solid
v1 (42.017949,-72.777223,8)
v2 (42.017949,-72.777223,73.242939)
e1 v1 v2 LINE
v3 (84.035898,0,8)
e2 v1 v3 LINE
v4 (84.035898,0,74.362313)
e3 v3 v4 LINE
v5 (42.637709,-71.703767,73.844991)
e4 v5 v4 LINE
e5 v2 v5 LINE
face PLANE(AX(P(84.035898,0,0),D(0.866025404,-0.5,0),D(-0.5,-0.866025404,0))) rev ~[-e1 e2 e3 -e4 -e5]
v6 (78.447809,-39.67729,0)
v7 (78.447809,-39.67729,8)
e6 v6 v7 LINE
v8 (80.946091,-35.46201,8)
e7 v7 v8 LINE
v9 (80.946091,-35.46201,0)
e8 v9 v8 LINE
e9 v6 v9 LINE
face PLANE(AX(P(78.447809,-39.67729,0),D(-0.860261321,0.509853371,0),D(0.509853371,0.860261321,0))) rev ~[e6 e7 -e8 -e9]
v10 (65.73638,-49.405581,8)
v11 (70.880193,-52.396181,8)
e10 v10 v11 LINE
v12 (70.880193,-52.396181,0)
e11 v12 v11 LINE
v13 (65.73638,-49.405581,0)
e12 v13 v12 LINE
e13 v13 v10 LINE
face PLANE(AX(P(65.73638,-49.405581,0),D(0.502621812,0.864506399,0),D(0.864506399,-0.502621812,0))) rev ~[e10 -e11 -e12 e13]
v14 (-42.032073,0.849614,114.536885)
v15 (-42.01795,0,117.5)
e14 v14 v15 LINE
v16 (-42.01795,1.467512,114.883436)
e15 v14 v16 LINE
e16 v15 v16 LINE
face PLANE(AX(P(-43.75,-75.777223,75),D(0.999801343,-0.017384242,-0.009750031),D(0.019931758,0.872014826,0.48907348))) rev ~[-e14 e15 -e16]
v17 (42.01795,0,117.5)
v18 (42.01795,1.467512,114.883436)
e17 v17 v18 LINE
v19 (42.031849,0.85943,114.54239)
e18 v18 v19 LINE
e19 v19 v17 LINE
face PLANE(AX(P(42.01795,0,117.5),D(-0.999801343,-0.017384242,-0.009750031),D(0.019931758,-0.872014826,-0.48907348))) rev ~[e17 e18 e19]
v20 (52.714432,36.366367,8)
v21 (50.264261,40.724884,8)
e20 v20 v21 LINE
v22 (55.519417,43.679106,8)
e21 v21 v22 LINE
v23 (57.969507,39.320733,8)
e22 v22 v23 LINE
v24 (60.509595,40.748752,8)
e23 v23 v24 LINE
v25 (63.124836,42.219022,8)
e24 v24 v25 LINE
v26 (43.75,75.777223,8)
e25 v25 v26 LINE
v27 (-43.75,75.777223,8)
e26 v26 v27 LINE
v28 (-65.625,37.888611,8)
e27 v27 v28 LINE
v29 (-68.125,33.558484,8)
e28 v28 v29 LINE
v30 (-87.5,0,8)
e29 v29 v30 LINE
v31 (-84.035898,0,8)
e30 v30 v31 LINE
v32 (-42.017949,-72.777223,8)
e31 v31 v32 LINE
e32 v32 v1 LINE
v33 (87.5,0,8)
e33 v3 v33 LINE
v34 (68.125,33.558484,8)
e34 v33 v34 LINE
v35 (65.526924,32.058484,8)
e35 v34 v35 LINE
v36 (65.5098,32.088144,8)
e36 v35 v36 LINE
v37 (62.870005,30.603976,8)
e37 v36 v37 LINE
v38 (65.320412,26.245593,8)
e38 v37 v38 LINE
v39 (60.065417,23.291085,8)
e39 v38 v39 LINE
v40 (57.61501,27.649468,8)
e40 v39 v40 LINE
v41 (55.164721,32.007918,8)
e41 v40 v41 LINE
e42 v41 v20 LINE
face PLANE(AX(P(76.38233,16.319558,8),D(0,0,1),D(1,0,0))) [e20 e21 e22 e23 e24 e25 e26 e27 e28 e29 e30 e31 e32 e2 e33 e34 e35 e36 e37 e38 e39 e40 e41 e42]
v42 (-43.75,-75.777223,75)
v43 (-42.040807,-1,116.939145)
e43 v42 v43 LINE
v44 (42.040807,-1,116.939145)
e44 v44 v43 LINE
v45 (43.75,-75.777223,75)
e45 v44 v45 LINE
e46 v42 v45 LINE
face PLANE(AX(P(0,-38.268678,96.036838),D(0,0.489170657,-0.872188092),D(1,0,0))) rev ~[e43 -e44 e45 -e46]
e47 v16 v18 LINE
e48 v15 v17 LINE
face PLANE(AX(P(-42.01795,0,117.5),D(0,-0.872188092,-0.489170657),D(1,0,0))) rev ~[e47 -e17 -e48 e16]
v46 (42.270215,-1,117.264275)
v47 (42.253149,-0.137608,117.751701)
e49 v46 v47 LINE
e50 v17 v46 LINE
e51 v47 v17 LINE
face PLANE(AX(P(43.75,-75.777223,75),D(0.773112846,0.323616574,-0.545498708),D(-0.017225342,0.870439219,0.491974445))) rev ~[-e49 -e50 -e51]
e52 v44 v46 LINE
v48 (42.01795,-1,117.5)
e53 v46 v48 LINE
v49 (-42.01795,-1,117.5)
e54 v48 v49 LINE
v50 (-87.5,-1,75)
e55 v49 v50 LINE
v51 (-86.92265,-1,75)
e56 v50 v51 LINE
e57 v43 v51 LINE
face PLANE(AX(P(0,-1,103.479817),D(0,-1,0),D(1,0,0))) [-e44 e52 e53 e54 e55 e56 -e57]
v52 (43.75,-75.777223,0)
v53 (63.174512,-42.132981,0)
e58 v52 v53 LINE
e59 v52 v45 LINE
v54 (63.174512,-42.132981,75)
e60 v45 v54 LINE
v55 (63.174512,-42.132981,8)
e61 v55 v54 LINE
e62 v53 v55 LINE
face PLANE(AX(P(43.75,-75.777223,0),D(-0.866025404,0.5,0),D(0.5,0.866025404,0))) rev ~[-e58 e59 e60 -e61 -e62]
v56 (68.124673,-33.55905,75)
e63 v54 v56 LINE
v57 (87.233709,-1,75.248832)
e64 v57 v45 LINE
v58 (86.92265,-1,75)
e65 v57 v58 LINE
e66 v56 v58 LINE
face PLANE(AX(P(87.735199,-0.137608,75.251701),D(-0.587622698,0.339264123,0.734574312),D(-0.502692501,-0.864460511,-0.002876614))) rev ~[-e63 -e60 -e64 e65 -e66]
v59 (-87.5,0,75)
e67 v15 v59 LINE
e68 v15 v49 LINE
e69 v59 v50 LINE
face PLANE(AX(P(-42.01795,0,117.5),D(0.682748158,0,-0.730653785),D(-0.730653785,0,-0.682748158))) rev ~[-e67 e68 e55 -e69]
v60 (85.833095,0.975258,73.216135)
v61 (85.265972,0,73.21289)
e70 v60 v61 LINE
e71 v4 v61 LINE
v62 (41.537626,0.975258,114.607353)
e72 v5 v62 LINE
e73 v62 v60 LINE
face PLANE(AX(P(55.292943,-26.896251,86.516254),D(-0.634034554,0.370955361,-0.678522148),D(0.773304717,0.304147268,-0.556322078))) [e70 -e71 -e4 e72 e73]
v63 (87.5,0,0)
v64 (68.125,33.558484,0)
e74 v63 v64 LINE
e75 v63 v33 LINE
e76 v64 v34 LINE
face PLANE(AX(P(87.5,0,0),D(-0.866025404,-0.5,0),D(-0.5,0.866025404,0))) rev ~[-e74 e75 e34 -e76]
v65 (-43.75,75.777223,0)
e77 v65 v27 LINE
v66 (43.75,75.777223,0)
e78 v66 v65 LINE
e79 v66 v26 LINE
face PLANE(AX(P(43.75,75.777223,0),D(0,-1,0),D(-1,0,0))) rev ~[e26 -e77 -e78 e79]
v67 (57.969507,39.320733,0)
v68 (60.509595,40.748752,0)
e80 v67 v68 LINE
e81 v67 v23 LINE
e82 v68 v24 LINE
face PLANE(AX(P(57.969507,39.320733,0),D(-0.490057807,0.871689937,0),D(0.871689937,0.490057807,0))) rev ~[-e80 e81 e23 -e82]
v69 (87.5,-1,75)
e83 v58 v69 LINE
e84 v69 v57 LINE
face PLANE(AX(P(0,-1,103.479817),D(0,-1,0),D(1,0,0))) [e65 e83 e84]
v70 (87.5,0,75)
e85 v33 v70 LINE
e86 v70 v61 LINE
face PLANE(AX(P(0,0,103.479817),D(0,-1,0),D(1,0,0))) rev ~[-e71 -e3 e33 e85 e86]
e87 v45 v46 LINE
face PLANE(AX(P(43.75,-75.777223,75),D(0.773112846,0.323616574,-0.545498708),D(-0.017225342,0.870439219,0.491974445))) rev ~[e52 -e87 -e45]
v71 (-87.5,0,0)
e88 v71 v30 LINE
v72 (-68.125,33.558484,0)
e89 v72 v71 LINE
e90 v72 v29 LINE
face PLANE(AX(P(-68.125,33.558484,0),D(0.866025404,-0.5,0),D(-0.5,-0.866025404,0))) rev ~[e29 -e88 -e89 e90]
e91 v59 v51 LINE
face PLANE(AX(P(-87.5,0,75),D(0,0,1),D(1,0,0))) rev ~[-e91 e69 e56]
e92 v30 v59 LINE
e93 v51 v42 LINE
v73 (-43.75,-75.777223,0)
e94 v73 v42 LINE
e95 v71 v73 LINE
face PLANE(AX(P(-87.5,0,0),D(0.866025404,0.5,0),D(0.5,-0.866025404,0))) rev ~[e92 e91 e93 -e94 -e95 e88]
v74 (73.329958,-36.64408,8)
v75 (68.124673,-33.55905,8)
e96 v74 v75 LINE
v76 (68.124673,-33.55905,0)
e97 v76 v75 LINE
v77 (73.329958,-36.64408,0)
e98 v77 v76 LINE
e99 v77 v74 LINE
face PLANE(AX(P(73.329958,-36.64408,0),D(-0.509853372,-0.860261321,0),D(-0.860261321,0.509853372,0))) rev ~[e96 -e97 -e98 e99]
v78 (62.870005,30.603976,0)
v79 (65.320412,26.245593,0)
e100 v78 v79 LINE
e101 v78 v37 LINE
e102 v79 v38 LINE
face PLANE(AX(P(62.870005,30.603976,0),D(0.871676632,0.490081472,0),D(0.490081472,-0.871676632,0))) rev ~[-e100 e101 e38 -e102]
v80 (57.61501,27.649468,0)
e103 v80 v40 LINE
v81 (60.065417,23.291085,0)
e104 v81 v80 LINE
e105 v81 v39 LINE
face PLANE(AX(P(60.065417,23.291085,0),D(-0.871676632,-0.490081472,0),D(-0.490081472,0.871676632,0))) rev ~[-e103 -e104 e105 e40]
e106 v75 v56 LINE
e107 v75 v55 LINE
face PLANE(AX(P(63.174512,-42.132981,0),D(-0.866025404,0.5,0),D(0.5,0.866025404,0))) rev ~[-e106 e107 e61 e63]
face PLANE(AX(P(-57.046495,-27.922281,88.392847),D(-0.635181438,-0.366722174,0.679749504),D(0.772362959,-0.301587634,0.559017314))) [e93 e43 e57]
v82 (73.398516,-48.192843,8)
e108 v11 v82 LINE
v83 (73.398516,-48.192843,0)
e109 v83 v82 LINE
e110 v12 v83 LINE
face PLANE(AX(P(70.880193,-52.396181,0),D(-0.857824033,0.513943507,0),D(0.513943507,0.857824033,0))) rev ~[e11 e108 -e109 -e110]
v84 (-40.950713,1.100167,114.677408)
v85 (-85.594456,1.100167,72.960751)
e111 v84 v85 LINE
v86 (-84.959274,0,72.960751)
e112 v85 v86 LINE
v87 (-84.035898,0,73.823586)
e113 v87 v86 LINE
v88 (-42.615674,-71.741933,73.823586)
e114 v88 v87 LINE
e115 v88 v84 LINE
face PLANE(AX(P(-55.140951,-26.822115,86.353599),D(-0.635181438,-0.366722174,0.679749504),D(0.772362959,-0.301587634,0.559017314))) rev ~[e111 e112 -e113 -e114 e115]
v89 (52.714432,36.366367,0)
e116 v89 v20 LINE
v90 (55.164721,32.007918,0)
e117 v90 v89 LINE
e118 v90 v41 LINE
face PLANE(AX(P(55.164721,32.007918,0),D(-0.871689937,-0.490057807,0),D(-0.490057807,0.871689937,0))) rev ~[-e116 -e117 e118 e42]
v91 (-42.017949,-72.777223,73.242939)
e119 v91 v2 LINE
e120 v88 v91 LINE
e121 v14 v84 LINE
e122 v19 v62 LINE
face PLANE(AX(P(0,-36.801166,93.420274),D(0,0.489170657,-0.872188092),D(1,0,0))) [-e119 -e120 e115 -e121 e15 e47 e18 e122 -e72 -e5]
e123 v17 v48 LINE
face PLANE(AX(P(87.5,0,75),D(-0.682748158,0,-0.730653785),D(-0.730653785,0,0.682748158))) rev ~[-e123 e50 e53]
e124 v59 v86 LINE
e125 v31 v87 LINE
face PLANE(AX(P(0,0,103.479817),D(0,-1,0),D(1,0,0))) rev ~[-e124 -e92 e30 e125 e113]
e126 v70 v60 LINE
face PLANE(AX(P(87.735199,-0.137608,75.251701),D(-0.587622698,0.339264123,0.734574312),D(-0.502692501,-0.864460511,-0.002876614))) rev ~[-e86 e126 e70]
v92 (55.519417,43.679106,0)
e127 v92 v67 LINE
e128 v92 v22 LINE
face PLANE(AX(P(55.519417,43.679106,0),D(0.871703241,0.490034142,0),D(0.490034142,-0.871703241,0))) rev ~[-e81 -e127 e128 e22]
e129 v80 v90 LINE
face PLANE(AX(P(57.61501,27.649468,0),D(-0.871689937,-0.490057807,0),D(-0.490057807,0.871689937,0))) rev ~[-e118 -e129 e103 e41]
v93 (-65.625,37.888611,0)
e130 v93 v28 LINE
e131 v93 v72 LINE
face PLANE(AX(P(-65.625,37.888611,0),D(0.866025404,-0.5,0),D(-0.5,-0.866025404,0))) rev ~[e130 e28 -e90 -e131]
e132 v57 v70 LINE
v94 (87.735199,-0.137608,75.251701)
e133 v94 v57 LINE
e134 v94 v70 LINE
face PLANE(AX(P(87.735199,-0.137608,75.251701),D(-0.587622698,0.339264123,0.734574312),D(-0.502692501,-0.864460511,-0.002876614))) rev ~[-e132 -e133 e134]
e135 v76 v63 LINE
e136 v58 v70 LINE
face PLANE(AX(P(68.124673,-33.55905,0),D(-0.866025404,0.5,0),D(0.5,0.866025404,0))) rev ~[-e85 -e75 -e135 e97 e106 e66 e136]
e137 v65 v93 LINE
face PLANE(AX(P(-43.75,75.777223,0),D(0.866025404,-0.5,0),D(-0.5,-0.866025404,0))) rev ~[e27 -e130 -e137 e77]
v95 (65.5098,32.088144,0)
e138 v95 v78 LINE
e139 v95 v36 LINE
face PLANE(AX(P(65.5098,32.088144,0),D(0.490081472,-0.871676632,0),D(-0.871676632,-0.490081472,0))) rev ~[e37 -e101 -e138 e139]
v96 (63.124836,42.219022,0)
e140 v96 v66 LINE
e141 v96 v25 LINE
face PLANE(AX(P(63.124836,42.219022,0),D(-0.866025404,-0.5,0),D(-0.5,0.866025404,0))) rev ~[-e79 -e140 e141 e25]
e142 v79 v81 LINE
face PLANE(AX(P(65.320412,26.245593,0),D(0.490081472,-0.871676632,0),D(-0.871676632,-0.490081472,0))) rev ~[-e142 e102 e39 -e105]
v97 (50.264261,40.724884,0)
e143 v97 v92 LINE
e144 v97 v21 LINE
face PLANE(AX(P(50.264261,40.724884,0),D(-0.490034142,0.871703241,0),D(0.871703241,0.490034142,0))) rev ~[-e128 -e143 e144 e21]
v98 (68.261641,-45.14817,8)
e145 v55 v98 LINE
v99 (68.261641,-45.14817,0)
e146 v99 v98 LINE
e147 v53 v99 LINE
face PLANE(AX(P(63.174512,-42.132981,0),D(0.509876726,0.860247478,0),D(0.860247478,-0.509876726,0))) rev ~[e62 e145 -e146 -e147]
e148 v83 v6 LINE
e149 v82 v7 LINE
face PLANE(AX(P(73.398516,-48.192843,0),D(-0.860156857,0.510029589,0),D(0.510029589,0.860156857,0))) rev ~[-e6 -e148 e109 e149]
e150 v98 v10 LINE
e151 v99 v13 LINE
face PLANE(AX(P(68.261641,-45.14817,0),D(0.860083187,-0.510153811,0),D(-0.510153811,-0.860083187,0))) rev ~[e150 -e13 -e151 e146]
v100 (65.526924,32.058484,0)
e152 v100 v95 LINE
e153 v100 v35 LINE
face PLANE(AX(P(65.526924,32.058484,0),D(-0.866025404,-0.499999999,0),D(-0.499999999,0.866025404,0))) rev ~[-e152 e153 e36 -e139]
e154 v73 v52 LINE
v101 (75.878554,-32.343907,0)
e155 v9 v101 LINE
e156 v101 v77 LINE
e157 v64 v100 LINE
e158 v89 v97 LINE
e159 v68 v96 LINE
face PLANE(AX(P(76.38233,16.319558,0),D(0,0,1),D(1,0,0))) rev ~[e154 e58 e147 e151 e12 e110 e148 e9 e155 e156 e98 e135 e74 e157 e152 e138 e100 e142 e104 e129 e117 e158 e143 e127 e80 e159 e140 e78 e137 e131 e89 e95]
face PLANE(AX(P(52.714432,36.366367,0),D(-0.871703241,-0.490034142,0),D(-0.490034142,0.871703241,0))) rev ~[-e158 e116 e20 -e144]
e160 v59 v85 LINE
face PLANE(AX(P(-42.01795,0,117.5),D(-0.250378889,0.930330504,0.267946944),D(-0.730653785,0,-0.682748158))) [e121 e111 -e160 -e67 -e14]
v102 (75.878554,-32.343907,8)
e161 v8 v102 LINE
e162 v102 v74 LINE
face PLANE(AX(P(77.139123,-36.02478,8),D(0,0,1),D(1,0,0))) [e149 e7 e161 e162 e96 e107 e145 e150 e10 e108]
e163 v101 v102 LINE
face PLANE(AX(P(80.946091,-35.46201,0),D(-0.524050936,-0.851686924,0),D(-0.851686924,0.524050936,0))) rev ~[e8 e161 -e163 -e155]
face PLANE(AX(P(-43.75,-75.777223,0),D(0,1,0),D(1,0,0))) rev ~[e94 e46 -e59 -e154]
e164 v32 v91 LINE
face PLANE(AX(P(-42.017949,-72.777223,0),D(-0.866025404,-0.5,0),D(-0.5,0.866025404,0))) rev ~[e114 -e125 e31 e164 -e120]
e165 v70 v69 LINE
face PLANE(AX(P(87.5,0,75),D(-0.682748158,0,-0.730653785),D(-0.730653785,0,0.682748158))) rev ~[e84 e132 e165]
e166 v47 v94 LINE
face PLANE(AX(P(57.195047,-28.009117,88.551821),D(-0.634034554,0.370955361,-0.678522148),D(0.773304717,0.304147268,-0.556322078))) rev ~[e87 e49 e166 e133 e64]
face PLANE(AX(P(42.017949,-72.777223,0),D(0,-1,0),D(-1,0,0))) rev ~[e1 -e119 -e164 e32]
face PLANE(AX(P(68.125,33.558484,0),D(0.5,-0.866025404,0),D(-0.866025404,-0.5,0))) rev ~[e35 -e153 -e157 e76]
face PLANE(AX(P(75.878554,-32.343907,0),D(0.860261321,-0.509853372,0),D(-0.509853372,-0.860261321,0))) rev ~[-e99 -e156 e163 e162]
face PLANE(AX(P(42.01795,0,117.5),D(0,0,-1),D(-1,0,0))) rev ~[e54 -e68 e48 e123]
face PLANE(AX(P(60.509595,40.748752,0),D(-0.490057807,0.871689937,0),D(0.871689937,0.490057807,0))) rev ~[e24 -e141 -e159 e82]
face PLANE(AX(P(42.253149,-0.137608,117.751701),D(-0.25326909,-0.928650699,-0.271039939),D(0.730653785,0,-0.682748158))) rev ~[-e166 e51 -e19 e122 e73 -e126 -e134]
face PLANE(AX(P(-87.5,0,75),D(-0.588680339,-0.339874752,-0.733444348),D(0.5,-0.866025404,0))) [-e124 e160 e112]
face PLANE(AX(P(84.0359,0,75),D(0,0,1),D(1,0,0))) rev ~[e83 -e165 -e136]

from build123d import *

# Parameters (mm, degrees)
F0_W      = 50
F0_H      = 12.5
F1_DEPTH  = 8
F2_DEPTH  = 75
F4_DEPTH  = 8
F7_DEPTH  = 3
F8_DEPTH  = 1
F11_DEPTH = 3
F14_DEPTH = 3
F15_DEPTH = 8
F16_DEPTH = 8
F17_DEPTH = 8


# Not quite as in the source:
# - a feature names something its author has since deleted; it is built from what else it names


with BuildPart() as f1:
    # F0 (on Top) → F1 (new body)
    with BuildSketch(Plane.XY):
        Polygon((57.9695070384, 39.3207329262), (60.5095952989, 40.7487522591), (42.0179491924, 72.7772228311), (-42.0179491924, 72.7772228311), (-84.0358983849, 0), (-42.0179491924, -72.7772228311), (42.0179491924, -72.7772228311), (84.0358983849, 0), (65.5269237886, 32.0584843966), (65.5097997054, 32.0881441788), (62.870004896, 30.6039762231), (65.3204122546, 26.2455930623), (60.0654171506, 23.2910848888), (57.615009792, 27.6494680496), (55.164720758, 32.0079177338), (52.7144317239, 36.366367418), (50.2642610162, 40.7248836223), (55.5194165334, 43.6791064608), align=None)
        with Locations((0, 54.5829171234)):
            Rectangle(F0_W, F0_H, mode=Mode.SUBTRACT)
    extrude(amount=F1_DEPTH)

    # F0 (on Top) → F2 (join)
    with BuildSketch(Plane.XY):
        Polygon((-84.0358983849, 0), (-87.5, 0), (-43.75, -75.7772228311), (43.75, -75.7772228311), (63.1745123486, -42.1329805311), (68.1246734519, -33.5590499945), (87.5, 0), (84.0358983849, 0), (42.0179491924, -72.7772228311), (-42.0179491924, -72.7772228311), align=None)
    extrude(amount=F2_DEPTH)

    # F0 (on Top) → F4 (join)
    with BuildSketch(Plane.XY):
        Polygon((43.75, 75.7772228311), (-43.75, 75.7772228311), (-65.625, 37.8886114156), (-68.125, 33.5584843966), (-87.5, 0), (-84.0358983849, 0), (-42.0179491924, 72.7772228311), (42.0179491924, 72.7772228311), (60.5095952989, 40.7487522591), (63.1248363216, 42.2190219338), align=None)
    extrude(amount=F4_DEPTH)

    # F6 (on face) → F7 (join)
    with BuildSketch(Plane(origin=(0, -50.1312366318, 89.3836679776), x_dir=(1, 0, 0), z_dir=(0, 0.4891706574, -0.872188092))):
        Polygon((43.75, 29.4041920927), (0, 29.4041920927), (-43.75, 29.4041920927), (-42.01795, -57.4775522498), (42.01795, -57.4775522498), align=None)
    extrude(amount=F7_DEPTH)

    # F3 (on Front) → F8 (join)
    with BuildSketch(Plane.XZ):
        Polygon((-42.01795, 114.5), (0, 114.5), (42.01795, 114.5), (84.0359, 75), (87.5, 75), (42.01795, 117.5), (0, 117.5), (-42.01795, 117.5), (-87.5, 75), (-84.0359, 75), align=None)
    extrude(amount=F8_DEPTH)

    # F10 (on face) → F11 (join)
    with BuildSketch(Plane(origin=(-67.6846727043, -39.0777640058, 72.4338274863), x_dir=(0.7723629594, -0.3015876344, 0.5590173143), z_dir=(-0.6351814378, -0.3667221741, 0.6797495039))):
        Polygon((33.2314262259, 55.789645187), (-25.6554603702, 35.6104118215), (30.9888924807, -31.0804218073), align=None)
    extrude(amount=-F11_DEPTH)

    # F13 (on face) → F14 (join)
    with BuildSketch(Plane(origin=(67.6756688636, -39.5950852503, 72.4241918832), x_dir=(0.7733047167, 0.3041472681, -0.556322078), z_dir=(-0.6340345536, 0.3709553614, -0.6785221475))):
        Polygon((-30.939509805, 30.5117392321), (-32.8751652468, -56.3649154418), (25.9400068576, -35.9776056011), align=None)
    extrude(amount=F14_DEPTH)

    # F0 (on Top) → F15 (join)
    with BuildSketch(Plane.XY):
        with Locations((0, 54.5829171234)):
            Rectangle(F0_W, F0_H)
    extrude(amount=F15_DEPTH)

    # F0 (on Top) → F16 (join)
    with BuildSketch(Plane.XY):
        Polygon((75.878553621, -32.3439069124), (73.3299584755, -36.6440801541), (78.4478092981, -39.6772904524), (80.9460908184, -35.4620099819), align=None)
        Polygon((73.3299584755, -36.6440801541), (68.1246734519, -33.5590499945), (63.1745123486, -42.1329805311), (68.2616414678, -45.1481695385), (73.3985163623, -48.1928433322), (78.4478092981, -39.6772904524), align=None)
        Polygon((73.3985163623, -48.1928433322), (68.2616414678, -45.1481695385), (65.7363801019, -49.4055813149), (70.880193178, -52.396181094), align=None)
    extrude(amount=F16_DEPTH)

    # F0 (on Top) → F17 (join)
    with BuildSketch(Plane.XY):
        Polygon((87.5, 0), (68.125, 33.5584843966), (65.5269237886, 32.0584843966), (84.0358983849, 0), align=None)
    extrude(amount=F17_DEPTH)


solid = f1.part
